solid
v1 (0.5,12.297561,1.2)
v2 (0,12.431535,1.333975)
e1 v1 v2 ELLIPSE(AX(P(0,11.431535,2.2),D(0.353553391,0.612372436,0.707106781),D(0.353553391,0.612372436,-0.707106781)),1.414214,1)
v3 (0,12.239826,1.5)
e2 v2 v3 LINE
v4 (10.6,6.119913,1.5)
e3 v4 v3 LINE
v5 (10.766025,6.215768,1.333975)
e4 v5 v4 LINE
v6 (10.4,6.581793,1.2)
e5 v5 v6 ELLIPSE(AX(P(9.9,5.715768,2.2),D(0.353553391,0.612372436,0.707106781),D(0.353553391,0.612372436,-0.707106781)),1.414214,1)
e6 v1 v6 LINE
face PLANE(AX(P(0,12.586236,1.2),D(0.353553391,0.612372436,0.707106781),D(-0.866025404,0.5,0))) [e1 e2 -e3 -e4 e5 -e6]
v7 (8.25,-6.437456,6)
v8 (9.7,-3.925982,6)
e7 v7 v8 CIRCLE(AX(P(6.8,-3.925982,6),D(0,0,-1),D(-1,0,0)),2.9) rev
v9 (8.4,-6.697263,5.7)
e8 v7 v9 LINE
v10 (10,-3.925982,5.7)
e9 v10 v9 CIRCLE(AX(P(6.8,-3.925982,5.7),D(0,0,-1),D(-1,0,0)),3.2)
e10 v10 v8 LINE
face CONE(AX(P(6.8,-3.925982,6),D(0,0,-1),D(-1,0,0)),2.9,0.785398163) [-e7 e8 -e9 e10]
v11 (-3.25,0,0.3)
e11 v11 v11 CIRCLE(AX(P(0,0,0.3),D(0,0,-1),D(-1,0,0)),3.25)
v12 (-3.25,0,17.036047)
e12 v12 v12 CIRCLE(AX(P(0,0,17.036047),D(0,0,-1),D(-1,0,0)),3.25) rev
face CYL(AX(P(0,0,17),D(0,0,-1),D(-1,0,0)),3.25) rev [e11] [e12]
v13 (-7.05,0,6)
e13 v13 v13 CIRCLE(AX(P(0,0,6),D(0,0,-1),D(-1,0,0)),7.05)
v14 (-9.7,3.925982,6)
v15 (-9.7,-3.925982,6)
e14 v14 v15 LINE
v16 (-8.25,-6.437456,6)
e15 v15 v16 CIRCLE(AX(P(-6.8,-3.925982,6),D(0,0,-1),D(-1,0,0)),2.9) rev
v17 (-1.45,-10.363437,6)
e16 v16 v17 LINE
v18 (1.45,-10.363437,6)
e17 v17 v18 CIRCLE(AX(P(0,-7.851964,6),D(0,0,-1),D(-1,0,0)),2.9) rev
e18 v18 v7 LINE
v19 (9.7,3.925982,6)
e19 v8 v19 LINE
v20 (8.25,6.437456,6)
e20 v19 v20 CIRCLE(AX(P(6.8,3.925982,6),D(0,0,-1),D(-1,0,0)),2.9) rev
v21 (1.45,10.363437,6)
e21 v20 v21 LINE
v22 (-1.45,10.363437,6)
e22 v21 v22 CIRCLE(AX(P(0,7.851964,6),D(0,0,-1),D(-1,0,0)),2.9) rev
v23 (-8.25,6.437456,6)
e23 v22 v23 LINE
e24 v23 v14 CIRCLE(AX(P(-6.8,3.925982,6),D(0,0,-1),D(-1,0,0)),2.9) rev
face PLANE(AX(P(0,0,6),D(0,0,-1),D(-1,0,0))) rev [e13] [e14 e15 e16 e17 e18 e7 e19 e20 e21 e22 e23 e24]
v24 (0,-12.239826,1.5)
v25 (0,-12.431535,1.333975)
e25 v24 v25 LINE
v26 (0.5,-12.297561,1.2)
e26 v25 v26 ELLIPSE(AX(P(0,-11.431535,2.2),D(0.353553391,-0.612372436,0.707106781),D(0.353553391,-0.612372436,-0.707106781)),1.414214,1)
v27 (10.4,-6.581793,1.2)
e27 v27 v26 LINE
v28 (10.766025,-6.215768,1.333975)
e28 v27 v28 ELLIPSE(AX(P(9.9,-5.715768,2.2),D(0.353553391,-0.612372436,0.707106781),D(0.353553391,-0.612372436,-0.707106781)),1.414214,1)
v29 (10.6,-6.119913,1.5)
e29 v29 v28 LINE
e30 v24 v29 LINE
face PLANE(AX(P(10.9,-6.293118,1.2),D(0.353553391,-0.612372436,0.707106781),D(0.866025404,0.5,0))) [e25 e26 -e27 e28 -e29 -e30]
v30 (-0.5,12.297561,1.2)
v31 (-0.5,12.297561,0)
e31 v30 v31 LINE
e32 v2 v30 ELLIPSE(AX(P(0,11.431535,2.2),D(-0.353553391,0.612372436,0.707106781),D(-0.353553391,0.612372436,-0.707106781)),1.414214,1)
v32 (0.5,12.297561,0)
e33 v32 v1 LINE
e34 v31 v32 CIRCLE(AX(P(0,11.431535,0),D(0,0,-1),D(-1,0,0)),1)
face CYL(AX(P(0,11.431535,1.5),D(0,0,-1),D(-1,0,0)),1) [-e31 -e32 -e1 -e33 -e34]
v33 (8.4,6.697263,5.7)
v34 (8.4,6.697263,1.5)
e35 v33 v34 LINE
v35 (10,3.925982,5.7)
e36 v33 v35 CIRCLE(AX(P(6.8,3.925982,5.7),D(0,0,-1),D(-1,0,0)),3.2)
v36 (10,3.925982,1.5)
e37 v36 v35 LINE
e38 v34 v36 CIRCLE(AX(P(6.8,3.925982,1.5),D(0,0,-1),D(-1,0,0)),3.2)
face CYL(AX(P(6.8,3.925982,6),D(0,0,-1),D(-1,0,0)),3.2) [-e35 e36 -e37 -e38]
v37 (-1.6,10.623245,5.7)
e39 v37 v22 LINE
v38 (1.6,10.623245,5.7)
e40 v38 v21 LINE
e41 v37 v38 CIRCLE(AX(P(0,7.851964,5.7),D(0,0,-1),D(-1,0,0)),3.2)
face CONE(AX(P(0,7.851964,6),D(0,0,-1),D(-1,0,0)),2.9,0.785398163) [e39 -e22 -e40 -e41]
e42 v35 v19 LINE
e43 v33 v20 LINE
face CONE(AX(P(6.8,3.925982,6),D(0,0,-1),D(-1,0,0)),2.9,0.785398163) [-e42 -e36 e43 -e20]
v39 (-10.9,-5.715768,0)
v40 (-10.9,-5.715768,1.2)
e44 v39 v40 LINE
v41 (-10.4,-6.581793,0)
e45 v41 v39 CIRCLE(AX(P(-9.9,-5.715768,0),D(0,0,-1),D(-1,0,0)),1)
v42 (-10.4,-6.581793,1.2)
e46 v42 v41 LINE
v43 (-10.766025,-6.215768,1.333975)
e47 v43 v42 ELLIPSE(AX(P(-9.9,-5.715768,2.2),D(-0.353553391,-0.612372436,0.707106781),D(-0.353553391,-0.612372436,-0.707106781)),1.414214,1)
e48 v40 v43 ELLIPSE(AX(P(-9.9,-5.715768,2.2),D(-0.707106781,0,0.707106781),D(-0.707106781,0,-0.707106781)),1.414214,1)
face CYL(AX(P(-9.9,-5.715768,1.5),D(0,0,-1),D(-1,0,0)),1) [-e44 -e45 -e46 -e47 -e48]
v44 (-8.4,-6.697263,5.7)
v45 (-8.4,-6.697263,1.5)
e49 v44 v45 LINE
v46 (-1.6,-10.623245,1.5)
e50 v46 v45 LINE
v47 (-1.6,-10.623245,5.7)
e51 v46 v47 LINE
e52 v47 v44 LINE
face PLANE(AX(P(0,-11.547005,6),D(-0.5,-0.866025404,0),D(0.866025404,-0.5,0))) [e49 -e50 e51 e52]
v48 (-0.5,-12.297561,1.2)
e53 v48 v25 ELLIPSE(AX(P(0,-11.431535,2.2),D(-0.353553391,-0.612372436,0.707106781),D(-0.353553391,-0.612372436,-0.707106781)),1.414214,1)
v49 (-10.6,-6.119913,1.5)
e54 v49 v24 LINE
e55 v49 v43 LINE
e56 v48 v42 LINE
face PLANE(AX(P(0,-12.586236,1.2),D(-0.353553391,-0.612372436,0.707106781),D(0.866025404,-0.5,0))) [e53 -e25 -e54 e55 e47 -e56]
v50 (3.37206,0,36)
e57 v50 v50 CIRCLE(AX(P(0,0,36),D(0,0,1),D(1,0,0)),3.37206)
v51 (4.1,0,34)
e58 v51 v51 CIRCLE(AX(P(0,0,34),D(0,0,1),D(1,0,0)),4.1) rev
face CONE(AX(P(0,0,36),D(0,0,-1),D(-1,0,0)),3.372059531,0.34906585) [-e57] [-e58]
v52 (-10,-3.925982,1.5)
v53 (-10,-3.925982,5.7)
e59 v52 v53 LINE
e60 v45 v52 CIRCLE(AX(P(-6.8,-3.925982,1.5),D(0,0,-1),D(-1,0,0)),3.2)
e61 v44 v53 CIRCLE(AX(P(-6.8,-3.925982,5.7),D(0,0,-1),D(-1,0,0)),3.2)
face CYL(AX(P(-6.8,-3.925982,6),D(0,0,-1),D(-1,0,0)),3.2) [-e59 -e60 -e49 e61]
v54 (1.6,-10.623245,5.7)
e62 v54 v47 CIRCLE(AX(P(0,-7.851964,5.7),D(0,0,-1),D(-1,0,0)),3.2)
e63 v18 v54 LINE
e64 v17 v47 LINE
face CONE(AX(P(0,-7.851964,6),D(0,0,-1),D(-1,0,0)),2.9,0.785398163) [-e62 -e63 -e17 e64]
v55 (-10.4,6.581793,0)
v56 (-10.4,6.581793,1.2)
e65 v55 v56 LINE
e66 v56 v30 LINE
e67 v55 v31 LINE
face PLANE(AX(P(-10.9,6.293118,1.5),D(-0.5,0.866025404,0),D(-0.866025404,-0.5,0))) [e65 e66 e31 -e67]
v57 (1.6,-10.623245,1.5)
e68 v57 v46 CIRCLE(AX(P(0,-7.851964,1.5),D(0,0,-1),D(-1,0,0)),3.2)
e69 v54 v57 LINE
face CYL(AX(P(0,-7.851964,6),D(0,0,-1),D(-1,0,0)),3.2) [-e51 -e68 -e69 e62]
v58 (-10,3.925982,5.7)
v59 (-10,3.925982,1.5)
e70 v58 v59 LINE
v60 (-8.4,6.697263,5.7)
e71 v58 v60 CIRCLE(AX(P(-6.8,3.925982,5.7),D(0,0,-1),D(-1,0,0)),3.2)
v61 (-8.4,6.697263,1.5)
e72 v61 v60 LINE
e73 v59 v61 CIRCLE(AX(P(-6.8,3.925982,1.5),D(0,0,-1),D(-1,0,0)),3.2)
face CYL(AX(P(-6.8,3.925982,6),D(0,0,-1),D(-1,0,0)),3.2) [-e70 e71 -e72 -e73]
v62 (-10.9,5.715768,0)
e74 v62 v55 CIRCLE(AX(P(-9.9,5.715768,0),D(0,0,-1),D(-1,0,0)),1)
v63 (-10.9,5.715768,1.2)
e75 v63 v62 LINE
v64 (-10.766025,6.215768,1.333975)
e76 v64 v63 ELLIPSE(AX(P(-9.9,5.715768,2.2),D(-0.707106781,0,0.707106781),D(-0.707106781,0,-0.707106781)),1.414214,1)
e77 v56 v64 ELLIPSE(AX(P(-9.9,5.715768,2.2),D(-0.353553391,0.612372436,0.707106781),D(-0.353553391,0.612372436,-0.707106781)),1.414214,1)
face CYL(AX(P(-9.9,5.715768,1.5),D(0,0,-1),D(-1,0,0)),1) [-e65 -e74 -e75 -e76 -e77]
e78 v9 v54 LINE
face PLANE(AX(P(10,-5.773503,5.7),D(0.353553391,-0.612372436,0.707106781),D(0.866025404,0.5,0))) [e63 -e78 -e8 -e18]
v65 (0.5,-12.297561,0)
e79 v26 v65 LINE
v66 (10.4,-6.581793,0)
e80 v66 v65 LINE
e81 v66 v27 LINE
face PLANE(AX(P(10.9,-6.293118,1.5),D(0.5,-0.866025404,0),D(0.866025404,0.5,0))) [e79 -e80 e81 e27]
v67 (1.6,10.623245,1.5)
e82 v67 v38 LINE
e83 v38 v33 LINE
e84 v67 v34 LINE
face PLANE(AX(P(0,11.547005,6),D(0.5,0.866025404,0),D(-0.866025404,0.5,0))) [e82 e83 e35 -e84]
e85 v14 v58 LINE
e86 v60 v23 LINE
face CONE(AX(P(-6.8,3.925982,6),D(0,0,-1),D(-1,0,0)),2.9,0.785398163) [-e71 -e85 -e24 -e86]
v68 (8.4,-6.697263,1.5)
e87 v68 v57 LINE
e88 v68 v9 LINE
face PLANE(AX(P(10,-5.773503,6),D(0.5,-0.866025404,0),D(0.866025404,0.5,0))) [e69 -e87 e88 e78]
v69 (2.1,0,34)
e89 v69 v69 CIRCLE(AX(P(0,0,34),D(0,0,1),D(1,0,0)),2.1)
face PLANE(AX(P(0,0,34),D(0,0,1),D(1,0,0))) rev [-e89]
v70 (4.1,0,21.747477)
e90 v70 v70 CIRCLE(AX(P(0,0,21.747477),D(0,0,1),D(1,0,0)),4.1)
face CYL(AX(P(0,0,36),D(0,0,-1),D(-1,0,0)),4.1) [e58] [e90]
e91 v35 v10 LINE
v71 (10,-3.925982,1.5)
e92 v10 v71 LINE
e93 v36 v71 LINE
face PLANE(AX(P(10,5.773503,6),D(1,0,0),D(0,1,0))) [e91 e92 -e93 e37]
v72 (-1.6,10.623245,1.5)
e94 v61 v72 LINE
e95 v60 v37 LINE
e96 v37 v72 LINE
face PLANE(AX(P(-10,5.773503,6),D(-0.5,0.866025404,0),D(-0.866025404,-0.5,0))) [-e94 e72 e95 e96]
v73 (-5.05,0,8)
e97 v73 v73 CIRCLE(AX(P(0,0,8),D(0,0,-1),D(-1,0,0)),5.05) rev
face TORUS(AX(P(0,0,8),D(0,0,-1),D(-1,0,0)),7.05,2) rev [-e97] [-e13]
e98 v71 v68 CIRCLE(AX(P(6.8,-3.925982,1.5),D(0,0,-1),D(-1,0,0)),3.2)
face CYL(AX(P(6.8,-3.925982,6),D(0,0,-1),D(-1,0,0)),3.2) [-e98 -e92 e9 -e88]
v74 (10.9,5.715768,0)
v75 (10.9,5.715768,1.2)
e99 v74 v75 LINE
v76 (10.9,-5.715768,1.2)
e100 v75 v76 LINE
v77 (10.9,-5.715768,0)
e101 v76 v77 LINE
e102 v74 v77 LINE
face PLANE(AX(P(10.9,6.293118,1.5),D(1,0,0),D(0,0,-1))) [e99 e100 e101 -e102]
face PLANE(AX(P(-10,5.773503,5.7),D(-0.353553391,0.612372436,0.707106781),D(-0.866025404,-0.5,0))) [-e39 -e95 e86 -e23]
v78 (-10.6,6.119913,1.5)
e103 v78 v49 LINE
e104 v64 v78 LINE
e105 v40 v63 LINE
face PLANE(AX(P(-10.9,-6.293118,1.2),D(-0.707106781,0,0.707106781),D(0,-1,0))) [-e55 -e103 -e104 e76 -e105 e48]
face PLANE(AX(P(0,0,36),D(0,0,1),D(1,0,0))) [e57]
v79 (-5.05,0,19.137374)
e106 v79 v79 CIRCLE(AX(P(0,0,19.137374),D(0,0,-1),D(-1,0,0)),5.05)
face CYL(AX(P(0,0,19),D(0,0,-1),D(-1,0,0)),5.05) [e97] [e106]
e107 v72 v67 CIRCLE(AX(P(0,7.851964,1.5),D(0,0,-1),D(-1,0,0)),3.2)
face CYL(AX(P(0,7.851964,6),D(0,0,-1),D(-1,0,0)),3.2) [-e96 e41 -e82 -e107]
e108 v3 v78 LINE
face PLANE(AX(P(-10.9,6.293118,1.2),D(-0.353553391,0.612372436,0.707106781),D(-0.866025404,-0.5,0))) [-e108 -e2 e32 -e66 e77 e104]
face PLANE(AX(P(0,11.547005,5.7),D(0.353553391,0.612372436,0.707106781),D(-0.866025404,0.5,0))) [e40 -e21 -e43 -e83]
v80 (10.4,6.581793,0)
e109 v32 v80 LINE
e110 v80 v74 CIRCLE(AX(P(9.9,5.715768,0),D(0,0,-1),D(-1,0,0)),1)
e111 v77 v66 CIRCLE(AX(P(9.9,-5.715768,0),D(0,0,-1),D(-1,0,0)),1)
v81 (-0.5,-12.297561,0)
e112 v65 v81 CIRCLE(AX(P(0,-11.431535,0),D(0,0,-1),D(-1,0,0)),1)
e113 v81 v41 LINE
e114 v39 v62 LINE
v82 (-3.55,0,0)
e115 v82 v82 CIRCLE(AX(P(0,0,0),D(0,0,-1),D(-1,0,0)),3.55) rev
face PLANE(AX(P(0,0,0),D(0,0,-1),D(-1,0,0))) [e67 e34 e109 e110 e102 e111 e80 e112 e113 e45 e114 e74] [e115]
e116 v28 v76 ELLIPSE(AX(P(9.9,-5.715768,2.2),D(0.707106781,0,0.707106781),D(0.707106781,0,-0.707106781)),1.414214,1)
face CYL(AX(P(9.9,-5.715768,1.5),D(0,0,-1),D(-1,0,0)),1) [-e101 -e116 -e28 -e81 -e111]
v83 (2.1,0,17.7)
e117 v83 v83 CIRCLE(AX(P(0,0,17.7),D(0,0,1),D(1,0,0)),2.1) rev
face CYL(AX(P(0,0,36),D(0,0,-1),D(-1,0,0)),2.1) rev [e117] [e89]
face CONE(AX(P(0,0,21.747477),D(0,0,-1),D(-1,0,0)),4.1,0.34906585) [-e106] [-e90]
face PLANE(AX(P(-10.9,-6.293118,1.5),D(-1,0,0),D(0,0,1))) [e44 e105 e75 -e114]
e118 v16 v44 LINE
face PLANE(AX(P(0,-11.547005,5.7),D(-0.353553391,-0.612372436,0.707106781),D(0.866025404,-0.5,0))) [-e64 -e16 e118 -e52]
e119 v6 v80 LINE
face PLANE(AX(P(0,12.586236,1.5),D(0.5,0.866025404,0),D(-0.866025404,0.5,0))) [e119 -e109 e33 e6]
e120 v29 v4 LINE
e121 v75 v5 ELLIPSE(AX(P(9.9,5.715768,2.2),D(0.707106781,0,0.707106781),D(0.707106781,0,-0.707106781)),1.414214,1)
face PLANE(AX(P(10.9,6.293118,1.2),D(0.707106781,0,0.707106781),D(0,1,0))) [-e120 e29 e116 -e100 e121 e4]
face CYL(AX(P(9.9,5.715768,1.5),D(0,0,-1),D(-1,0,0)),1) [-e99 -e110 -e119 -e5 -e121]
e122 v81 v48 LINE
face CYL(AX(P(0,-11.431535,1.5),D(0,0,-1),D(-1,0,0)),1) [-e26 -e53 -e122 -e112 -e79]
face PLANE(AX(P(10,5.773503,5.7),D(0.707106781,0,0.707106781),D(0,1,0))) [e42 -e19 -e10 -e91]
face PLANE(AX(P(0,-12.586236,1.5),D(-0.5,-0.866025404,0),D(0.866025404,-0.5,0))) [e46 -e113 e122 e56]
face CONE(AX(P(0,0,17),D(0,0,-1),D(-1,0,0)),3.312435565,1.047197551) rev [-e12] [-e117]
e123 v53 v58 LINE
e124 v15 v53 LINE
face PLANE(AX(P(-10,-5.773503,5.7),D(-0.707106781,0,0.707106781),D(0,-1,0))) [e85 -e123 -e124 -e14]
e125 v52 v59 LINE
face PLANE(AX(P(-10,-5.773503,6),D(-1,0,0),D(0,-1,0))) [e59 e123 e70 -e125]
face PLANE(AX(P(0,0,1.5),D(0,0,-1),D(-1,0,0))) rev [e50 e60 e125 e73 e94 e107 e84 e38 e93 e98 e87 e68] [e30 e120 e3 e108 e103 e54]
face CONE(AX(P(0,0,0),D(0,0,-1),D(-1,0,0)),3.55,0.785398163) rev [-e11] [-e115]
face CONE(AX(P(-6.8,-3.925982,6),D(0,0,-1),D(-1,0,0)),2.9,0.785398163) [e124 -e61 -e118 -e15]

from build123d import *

# Parameters (mm, degrees)
BOSS_EXTRUDE1_DEPTH  = 1.5
SKETCH1_8_R          = 4.1
BOSS_EXTRUDE3_DEPTH  = 36
SKETCH1_9_R          = 5.05
BOSS_EXTRUDE4_DEPTH  = 19
SHELL1_START         = 2
SHELL1_OUTLINE_R     = 2.1
SHELL1_DEPTH         = 32
SHELL1_2_OUTLINE_R   = 3.05
SHELL1_2_OUTLINE_R_2 = 2.1
SHELL1_2_DEPTH       = 15
SKETCH1_10_R         = 3.25
CUT_EXTRUDE1_DEPTH   = 17
SKETCH1_3_R          = 3.25
BOSS_EXTRUDE2_DEPTH  = 6
CHAMFER1_SIZE        = 2
CHAMFER1_SIZE2       = 0.727940469
CHAMFER2_SIZE        = 2.747477419
CHAMFER2_SIZE_2      = 1
CHAMFER3_SIZE        = 1.212435565
CHAMFER3_SIZE_2      = 0.7
CHAMFER6_SIZE        = 0.3
FILLET1_R            = 3.2
CHAMFER5_SIZE        = 0.3
FILLET2_R            = 1
FILLET3_R            = 2


# Read off the part's stored shape, not the designer's step: Shell1
with BuildPart() as part:
    # Sketch1 → Boss-Extrude1 (new body)
    with BuildSketch(Plane.XY):
        Polygon((-10.9, 6.293117934), (0, 12.586235868), (10.9, 6.293117934), (10.9, -6.293117934), (0, -12.586235868), (-10.9, -6.293117934), align=None)
    extrude(amount=BOSS_EXTRUDE1_DEPTH)

    # Sketch1<8> → Boss-Extrude3 (add)
    with BuildSketch(Plane.XY):
        with Locations(Location((0, 0, 0), (0, 0, 180))):
            Circle(SKETCH1_8_R)
    extrude(amount=BOSS_EXTRUDE3_DEPTH)

    # Sketch1<9> → Boss-Extrude4 (add)
    with BuildSketch(Plane.XY):
        with Locations(Location((0, 0, 0), (0, 0, 180))):
            Circle(SKETCH1_9_R)
    extrude(amount=BOSS_EXTRUDE4_DEPTH)

    # Shell1 outline → Shell1 (cut)
    with BuildSketch(Plane.XY.offset(SHELL1_START)):
        Circle(SHELL1_OUTLINE_R)
    extrude(amount=SHELL1_DEPTH, mode=Mode.SUBTRACT)

    # Shell1 2 outline → Shell1 2 (cut)
    with BuildSketch(Plane.XY.offset(SHELL1_START)):
        Circle(SHELL1_2_OUTLINE_R)
        Circle(SHELL1_2_OUTLINE_R_2, mode=Mode.SUBTRACT)
    extrude(amount=SHELL1_2_DEPTH, mode=Mode.SUBTRACT)

    # Sketch1<10> → Cut-Extrude1 (cut)
    with BuildSketch(Plane.XY):
        Circle(SKETCH1_10_R)
    extrude(amount=CUT_EXTRUDE1_DEPTH, mode=Mode.SUBTRACT)

    # Sketch1<3> → Boss-Extrude2 (add)
    with BuildSketch(Plane.XY):
        Polygon((0, 11.547005384), (10, 5.773502692), (10, -5.773502692), (0, -11.547005384), (-10, -5.773502692), (-10, 5.773502692), align=None)
        Circle(SKETCH1_3_R, mode=Mode.SUBTRACT)
    extrude(amount=BOSS_EXTRUDE2_DEPTH)

    # Chamfer1
    chamfer1_edges = [part.edges().sort_by_distance(p)[0] for p in [
        (4.1, 0, 36),
    ]]
    chamfer1_side = [part.faces().sort_by_distance(p)[0] for p in [
        (4.1, 0, 27.5),
    ]]
    chamfer(chamfer1_edges, length=CHAMFER1_SIZE, length2=CHAMFER1_SIZE2, reference=chamfer1_side[0])

    # Chamfer2
    # the kernel refuses this chamfer: 2.747477419, 1 mm, written as the material it adds along each edge
    with BuildSketch(Plane(origin=(0, 0, 19), x_dir=(-1, 0, 0), z_dir=(0, -1, 0))) as chamfer2_piece_1_section:
        Polygon((4.1, -CHAMFER2_SIZE), (4.1 + CHAMFER2_SIZE_2, 0), (4.1, 0), align=None)
    chamfer2_piece_1 = revolve(axis=Axis((0, 0, 19), (0, 0, -1)), mode=Mode.PRIVATE)
    chamfer2_piece_1 = chamfer2_piece_1 & Plane(origin=(0, 0, 20.481947897), x_dir=(-1, 0, 0), z_dir=(0, 0, -1)) * Cylinder(5.05, 21, mode=Mode.PRIVATE)
    add(chamfer2_piece_1)

    # Chamfer3
    # the kernel refuses this chamfer: 1.212435565, 0.7 mm, written as the material it takes off along each edge
    with BuildSketch(Plane(origin=(0, 0, 17), x_dir=(1, 0, 0), z_dir=(0, -1, 0))) as chamfer3_piece_1_section:
        Polygon((2.1 + CHAMFER3_SIZE, 0), (2.1, CHAMFER3_SIZE_2), (2.1, 0), align=None)
    chamfer3_piece_1 = revolve(axis=Axis((0, 0, 17), (0, 0, 1)), mode=Mode.PRIVATE)
    chamfer3_piece_1 = chamfer3_piece_1 & Plane(origin=(0, 0, 17.363214185), x_dir=(1, 0, 0), z_dir=(0, 0, -1)) * Cylinder(3.25, 14, mode=Mode.PRIVATE)
    add(chamfer3_piece_1, mode=Mode.SUBTRACT)

    # Chamfer6
    chamfer6_edges = [part.edges().sort_by_distance(p)[0] for p in [
        (-3.25, 0, 0),
    ]]
    chamfer(chamfer6_edges, length=CHAMFER6_SIZE)

    # Fillet1
    fillet1_edges = [part.edges().sort_by_distance(p)[0] for p in [
        (-10, -5.773502692, 3.75),
        (0, -11.547005384, 3.75),
        (10, -5.773502692, 3.75),
        (10, 5.773502692, 3.75),
        (0, 11.547005384, 3.75),
        (-10, 5.773502692, 3.75),
    ]]
    fillet(fillet1_edges, radius=FILLET1_R)

    # Chamfer5
    chamfer5_edges = [part.edges().sort_by_distance(p)[0] for p in [
        (-5, -8.660254038, 6),
        (5, 8.660254038, 6),
        (-5, 8.660254038, 6),
        (-10, 0, 6),
        (9.571281292, 5.52598183, 6),
        (0, 11.051963661, 6),
        (-9.571281292, 5.52598183, 6),
        (-9.571281292, -5.52598183, 6),
        (0, -11.051963661, 6),
        (9.571281292, -5.52598183, 6),
        (5.45, 9.439676901, 1.5),
        (10.9, 0, 1.5),
        (5.45, -9.439676901, 1.5),
        (-5.45, -9.439676901, 1.5),
        (-10.9, 0, 1.5),
        (-5.45, 9.439676901, 1.5),
        (10, 0, 6),
        (5, -8.660254038, 6),
    ]]
    chamfer(chamfer5_edges, length=CHAMFER5_SIZE)

    # Fillet2
    fillet2_edges = [part.edges().sort_by_distance(p)[0] for p in [
        (10.9, 6.293117934, 0.6),
        (10.9, -6.293117934, 0.6),
        (0, -12.586235868, 0.6),
        (-10.9, -6.293117934, 0.6),
        (-10.9, 6.293117934, 0.6),
        (0, 12.586235868, 0.6),
    ]]
    fillet(fillet2_edges, radius=FILLET2_R)

    # Fillet3
    fillet3_edges = [part.edges().sort_by_distance(p)[0] for p in [
        (5.05, 0, 6),
    ]]
    fillet(fillet3_edges, radius=FILLET3_R)


solid = part.part
